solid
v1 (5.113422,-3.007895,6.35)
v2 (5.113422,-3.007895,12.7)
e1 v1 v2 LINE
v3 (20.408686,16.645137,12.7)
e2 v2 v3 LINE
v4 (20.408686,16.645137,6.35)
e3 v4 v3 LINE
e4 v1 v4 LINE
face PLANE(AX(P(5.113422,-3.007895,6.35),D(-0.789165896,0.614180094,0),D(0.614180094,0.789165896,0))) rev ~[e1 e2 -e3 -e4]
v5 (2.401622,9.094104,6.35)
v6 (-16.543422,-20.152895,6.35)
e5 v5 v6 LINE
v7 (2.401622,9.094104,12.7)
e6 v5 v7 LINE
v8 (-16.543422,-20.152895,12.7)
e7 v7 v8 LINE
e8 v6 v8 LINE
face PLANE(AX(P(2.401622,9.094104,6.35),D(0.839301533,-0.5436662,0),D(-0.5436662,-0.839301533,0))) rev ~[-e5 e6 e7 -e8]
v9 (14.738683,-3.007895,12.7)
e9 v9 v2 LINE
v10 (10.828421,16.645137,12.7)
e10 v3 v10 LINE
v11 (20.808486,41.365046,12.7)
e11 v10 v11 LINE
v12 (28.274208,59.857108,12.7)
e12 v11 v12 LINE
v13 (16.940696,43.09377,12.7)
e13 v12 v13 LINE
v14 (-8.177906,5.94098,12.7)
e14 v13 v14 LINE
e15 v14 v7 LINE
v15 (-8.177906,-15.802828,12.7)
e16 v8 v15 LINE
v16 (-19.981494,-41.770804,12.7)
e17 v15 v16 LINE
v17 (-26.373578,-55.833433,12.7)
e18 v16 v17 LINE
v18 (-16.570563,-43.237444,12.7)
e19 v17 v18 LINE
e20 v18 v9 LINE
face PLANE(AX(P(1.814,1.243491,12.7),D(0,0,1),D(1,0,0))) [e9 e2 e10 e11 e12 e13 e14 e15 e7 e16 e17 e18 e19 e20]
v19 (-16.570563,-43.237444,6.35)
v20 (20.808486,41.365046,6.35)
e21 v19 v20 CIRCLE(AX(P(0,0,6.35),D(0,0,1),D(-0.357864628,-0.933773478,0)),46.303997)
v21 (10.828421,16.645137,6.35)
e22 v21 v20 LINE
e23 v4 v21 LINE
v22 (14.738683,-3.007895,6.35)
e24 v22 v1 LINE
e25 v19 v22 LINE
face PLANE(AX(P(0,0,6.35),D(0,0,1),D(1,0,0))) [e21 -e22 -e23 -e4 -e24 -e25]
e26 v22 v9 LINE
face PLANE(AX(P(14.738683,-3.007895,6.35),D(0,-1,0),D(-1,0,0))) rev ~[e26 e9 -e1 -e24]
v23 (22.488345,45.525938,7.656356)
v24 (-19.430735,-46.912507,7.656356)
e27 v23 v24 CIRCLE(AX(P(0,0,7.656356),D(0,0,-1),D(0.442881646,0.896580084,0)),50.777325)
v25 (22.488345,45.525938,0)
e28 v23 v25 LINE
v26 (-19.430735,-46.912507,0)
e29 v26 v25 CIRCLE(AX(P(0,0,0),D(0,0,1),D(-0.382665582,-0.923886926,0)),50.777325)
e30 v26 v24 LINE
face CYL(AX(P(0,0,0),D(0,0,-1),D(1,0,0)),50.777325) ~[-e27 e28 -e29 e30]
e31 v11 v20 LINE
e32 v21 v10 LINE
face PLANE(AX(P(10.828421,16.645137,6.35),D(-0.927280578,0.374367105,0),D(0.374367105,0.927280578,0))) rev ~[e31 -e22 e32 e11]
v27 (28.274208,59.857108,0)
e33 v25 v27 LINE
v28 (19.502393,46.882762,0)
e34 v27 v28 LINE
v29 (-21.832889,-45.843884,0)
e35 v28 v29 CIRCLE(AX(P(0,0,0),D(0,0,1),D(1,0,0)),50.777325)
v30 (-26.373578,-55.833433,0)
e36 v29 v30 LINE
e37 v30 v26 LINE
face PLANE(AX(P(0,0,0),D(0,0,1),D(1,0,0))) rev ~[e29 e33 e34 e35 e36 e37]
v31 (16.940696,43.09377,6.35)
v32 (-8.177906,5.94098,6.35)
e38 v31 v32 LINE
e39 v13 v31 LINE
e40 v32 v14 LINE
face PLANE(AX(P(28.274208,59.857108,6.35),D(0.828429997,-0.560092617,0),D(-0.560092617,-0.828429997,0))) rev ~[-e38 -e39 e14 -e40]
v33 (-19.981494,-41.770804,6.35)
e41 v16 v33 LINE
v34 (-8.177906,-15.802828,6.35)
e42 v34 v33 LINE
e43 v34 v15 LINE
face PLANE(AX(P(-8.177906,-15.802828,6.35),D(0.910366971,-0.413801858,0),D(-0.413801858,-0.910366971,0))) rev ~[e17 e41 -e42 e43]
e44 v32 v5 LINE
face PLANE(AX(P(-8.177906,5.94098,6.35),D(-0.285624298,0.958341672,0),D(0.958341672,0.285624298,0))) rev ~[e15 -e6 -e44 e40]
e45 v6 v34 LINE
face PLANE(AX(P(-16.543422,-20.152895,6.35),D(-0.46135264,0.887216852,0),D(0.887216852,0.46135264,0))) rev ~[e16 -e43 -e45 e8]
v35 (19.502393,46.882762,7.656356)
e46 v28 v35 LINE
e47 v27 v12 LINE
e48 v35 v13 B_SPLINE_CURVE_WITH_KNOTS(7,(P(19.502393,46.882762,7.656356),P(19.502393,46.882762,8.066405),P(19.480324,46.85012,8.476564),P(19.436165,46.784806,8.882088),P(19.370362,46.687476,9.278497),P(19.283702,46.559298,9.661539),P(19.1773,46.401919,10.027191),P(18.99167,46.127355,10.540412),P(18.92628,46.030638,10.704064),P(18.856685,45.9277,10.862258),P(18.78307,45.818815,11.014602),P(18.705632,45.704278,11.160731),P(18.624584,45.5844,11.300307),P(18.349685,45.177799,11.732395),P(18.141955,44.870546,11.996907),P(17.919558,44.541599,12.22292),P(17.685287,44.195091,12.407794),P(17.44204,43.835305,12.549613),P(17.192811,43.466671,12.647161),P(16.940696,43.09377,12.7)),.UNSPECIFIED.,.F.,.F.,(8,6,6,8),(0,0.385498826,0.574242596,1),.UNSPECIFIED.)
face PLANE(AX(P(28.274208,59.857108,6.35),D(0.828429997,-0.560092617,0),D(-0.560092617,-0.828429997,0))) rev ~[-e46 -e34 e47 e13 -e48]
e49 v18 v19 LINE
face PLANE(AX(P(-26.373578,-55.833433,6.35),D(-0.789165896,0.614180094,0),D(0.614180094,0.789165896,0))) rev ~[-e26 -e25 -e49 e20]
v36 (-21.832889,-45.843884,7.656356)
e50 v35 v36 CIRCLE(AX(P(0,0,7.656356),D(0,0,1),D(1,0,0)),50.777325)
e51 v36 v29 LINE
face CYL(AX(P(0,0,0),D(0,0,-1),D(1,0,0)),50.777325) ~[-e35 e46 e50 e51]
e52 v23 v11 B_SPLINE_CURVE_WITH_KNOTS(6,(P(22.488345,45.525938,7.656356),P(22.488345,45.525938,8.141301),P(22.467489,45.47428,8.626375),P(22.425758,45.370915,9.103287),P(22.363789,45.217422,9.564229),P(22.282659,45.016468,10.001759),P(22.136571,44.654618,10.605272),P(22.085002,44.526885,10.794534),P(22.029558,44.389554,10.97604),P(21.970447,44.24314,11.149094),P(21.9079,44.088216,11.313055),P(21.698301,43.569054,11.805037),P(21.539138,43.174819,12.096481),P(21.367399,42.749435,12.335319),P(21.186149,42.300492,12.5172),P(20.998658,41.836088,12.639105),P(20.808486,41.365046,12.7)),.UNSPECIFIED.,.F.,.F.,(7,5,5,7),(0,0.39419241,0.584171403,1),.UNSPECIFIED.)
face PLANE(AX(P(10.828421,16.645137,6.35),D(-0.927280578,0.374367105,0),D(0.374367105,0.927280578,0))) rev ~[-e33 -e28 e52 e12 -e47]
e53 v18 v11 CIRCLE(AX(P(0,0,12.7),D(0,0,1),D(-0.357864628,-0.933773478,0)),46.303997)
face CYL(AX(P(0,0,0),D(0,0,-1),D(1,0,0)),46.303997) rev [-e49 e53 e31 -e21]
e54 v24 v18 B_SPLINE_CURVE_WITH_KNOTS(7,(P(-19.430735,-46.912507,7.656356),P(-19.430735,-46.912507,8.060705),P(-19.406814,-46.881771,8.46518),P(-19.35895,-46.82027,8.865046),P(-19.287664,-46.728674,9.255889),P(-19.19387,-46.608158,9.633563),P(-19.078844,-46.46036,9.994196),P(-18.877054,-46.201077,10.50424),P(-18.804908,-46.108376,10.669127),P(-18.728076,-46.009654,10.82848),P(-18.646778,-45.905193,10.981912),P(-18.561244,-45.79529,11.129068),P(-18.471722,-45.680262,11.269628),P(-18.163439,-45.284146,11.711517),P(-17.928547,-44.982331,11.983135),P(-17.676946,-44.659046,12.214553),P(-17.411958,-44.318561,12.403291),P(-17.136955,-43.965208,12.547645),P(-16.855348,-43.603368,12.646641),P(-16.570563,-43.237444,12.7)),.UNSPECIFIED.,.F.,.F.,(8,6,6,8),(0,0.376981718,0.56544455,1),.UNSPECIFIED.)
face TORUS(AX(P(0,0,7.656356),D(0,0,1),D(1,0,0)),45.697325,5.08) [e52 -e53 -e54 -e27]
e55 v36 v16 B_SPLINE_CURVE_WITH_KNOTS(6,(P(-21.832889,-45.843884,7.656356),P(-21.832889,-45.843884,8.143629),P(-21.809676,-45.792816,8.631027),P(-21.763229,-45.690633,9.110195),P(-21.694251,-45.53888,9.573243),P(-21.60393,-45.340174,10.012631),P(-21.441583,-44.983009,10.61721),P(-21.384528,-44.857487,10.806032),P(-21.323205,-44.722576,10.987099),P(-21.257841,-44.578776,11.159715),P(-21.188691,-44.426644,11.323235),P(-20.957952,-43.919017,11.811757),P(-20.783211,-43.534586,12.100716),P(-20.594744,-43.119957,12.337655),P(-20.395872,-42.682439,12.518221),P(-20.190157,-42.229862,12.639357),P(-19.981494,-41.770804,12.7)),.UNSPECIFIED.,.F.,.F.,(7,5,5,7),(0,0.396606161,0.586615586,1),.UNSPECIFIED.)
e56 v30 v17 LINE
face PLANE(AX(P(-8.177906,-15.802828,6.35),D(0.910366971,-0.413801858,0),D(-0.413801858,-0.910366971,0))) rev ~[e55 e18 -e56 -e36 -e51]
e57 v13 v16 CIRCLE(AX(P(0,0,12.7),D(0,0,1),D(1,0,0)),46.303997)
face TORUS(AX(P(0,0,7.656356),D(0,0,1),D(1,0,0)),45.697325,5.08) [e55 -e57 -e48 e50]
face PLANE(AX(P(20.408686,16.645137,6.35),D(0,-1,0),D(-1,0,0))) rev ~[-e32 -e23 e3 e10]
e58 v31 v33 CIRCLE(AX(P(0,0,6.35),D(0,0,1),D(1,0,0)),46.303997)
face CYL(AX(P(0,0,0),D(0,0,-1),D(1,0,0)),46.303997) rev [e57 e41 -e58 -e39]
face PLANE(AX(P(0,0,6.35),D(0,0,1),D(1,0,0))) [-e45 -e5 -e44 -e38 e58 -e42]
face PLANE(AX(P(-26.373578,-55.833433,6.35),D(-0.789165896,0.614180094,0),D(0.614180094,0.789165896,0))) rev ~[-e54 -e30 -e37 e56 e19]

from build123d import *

# Parameters (mm, degrees)
F0_R     = 46.303997109
F1_DEPTH = 6.35
F0_R_2   = 50.7773250867
F2_DEPTH = 12.7
F5_DEPTH = 6.35
F6_DEPTH = 12.7


# Not quite as in the source:
# - a fillet or chamfer that OpenCascade refuses, or shapes differently, is made with other operations: its cross-section is extruded or revolved along the edge and cut away or added


with BuildPart() as f1:
    # F0 (on Top) → F1 (new body)
    with BuildSketch(Plane.XY):
        Circle(F0_R)
    extrude(amount=F1_DEPTH)

    # F0 (on Top) → F2 (join)
    with BuildSketch(Plane.XY):
        Circle(F0_R_2)
        Circle(F0_R, mode=Mode.SUBTRACT)
    extrude(amount=F2_DEPTH)

    # F3: fillet of radius 5.08 on 1 edges, made by hand

    # F3_s1 → F3_t2 (revolve, cut)
    with BuildSketch(Plane.XZ):
        with BuildLine():
            ThreePointArc((50.7773250867, 7.6563555778), (49.4978706971, 11.0271497073), (46.303997109, 12.7))
            Line((46.303997109, 12.7), (46.3161305494, 12.8008728884))
            ThreePointArc((46.3161305494, 12.8008728884), (48.5406610978, 12.8016), (50.7773250867, 12.8016))
            Line((50.7773250867, 12.8016), (50.8789250867, 12.7))
            Line((50.8789250867, 12.7), (50.8789250867, 7.6563555778))
            Line((50.8789250867, 7.6563555778), (50.7773250867, 7.6563555778))
        make_face()
    revolve(axis=Axis((0, 0, 12.7), (0, 0, 1)), mode=Mode.SUBTRACT)

    # F4 (on face) → F5 (join)
    with BuildSketch(Plane.XY.offset(6.35)):
        Polygon((-8.1779062748, -15.8028278183), (-26.3735784938, -55.8334334653), (14.7386826575, -3.0078946147), (5.1134219393, -3.0078946147), (20.4086864271, 16.6451374931), (10.8284205198, 16.6451374931), (28.2742083073, 59.8571076989), (-8.1779062748, 5.9409798123), (2.4016224779, 9.0941041708), (-16.5434218943, -20.15289478), align=None)
    extrude(amount=F5_DEPTH)

    # F6 (add): a face of the model
    f6_faces = [f1.faces().sort_by_distance(p)[0] for p in [
        (2.0188421937, 0.3767409736, 12.7),
    ]]
    extrude(f6_faces, amount=-F6_DEPTH)


solid = f1.part
